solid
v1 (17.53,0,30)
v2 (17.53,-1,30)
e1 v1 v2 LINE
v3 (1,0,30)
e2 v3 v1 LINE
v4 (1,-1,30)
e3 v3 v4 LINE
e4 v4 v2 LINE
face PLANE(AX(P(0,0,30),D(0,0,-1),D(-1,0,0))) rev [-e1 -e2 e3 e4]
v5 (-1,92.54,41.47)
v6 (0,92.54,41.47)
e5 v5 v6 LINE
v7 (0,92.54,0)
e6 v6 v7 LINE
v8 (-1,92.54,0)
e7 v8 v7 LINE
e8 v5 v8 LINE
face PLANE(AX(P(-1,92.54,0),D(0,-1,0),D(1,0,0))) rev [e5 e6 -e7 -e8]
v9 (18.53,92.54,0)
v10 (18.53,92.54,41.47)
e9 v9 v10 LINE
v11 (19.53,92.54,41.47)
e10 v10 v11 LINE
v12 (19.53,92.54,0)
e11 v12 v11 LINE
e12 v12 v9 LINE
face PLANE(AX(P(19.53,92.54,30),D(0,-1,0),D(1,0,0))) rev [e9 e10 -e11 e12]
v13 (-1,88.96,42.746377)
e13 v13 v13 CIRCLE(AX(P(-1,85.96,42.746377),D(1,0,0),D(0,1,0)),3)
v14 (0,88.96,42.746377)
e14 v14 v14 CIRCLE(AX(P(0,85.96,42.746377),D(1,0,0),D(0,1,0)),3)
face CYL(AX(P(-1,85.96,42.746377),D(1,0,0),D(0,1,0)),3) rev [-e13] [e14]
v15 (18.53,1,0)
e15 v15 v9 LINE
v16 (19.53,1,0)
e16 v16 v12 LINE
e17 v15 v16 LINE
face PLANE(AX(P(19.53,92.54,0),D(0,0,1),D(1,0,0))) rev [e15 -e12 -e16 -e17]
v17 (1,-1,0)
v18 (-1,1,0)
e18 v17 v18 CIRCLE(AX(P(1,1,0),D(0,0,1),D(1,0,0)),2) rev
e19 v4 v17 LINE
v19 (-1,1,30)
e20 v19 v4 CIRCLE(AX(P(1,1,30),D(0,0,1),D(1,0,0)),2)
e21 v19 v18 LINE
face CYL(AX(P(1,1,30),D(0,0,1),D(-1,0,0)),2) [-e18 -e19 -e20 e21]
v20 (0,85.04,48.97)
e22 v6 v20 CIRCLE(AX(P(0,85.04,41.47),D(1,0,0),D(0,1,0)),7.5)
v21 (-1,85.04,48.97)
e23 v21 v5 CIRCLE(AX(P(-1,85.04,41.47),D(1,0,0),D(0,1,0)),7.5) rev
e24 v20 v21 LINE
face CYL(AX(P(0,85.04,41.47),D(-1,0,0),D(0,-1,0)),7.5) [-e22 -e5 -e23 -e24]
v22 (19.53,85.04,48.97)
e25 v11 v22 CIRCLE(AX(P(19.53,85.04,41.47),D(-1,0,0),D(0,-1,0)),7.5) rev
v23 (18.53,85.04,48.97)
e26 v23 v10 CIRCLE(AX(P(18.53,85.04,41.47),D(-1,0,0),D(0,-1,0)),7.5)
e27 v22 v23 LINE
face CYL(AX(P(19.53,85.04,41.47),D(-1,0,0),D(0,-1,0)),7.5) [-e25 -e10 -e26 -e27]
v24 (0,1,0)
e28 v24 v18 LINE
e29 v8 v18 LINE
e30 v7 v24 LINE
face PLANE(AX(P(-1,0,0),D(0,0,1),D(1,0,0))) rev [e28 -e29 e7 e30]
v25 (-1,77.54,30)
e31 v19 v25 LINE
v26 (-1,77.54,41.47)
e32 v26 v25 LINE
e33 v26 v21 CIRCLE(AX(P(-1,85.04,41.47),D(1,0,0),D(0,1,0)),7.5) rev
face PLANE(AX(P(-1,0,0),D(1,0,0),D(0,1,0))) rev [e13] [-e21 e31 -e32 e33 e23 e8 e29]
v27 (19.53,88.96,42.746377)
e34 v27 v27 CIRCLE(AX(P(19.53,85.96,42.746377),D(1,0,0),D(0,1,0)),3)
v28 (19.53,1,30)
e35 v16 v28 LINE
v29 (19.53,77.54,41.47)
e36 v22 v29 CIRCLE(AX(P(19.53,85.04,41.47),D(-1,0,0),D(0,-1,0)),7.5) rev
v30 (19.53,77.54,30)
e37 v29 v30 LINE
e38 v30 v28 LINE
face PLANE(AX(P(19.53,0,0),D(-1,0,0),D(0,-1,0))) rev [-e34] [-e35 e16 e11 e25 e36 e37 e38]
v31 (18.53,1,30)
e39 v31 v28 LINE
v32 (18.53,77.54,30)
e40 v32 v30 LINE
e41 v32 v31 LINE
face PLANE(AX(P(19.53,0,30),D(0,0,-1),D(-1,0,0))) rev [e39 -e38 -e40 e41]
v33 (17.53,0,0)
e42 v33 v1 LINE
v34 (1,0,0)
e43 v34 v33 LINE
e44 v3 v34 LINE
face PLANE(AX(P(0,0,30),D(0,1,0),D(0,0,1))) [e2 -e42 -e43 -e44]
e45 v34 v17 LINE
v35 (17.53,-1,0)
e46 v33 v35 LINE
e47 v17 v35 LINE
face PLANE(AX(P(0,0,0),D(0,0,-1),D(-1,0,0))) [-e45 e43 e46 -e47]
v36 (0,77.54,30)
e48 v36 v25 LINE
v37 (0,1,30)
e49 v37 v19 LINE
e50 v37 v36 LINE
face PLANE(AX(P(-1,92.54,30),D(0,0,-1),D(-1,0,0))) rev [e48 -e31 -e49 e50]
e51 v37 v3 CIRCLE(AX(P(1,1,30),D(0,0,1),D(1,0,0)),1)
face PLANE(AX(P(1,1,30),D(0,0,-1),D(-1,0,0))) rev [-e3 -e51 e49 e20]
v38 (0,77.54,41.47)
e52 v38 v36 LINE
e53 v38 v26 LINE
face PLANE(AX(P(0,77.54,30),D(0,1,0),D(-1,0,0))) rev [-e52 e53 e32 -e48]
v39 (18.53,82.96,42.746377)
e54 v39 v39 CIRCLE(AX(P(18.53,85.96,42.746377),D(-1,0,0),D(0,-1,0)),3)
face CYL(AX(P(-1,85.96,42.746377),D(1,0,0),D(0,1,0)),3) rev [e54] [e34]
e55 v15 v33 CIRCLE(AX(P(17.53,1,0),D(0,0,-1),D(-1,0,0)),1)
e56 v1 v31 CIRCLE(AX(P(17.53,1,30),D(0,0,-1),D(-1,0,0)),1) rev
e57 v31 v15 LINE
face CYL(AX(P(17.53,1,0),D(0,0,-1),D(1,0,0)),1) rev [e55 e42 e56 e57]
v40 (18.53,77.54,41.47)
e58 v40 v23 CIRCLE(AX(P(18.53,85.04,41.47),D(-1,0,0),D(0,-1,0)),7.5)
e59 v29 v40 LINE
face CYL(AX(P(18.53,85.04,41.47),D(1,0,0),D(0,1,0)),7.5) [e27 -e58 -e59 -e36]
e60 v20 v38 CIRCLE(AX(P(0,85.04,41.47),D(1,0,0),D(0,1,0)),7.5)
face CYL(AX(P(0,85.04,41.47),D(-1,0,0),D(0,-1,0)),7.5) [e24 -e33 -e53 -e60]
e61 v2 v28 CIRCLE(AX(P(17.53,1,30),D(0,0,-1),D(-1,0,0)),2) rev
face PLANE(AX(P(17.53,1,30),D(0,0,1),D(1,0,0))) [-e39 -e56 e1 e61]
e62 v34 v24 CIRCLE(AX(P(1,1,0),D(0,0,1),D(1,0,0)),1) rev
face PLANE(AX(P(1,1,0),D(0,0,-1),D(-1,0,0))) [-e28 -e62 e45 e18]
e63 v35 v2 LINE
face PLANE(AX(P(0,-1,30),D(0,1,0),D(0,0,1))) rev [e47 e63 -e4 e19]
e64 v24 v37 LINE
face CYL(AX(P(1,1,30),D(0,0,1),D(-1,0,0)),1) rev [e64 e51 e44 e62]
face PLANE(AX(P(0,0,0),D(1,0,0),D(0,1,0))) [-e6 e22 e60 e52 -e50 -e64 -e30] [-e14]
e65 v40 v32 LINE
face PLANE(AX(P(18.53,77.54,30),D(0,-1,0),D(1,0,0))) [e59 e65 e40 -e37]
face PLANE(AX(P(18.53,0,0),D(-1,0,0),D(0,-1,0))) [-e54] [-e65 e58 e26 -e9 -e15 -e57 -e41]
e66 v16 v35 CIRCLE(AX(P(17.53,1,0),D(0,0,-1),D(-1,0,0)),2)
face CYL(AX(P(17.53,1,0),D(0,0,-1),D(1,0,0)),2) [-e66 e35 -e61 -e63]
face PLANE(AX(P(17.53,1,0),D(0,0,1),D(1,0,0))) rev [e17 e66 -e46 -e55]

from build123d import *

# Parameters (mm, degrees)
SKETCH1_W                      = 18.53
SKETCH1_H                      = 1
BASE_FLANGE1_DEPTH             = 30
EDGE_FLANGE1_STRIP_W           = 6
EDGE_FLANGE1_STRIP_H           = 1
EDGE_FLANGE1_STRIP_CUT_DEPTH   = 30
EDGE_FLANGE1_STRIP_2_W         = 6
EDGE_FLANGE1_STRIP_2_H         = 1
EDGE_FLANGE1_STRIP_CUT_2_DEPTH = 30
EDGE_FLANGE1_DEPTH             = 30
EDGE_FLANGE1_BEND_DEPTH        = 30
SKETCH17_W                     = 18.97
SKETCH17_H                     = 15
TAB1_DEPTH                     = 1
SKETCH24_R                     = 3
CUT_EXTRUDE1_DEPTH             = 107.692049376
FILLET1_R                      = 7.5


# Sheet-metal steps are written as plain solids
with BuildPart() as part:
    # Sketch1 → Base-Flange1 (new body)
    with BuildSketch(Plane.XY):
        with Locations((9.265, -0.5)):
            Rectangle(SKETCH1_W, SKETCH1_H)
    extrude(amount=BASE_FLANGE1_DEPTH)

    # Edge-Flange1 strip (across the edge) → Edge-Flange1 strip cut (cut)
    with BuildSketch(Plane(origin=(18.53, 0, 30), x_dir=(-1, 0, 0), z_dir=(0, 0, -1))):
        with Locations((-2, -0.5)):
            Rectangle(EDGE_FLANGE1_STRIP_W, EDGE_FLANGE1_STRIP_H)
    extrude(amount=EDGE_FLANGE1_STRIP_CUT_DEPTH, mode=Mode.SUBTRACT)

    # Edge-Flange1 strip 2 (across the edge) → Edge-Flange1 strip cut 2 (cut)
    with BuildSketch(Plane.XY):
        with Locations((-2, -0.5)):
            Rectangle(EDGE_FLANGE1_STRIP_2_W, EDGE_FLANGE1_STRIP_2_H)
    extrude(amount=EDGE_FLANGE1_STRIP_CUT_2_DEPTH, mode=Mode.SUBTRACT)

    # Edge-Flange1 section (across the edge) → Edge-Flange1 (add)
    with BuildSketch(Plane(origin=(18.53, 0, 30), x_dir=(-1, 0, 0), z_dir=(0, 0, -1))):
        with BuildLine():
            Line((-1, 1), (-1, 92.54))
            Line((-1, 92.54), (0, 92.54))
            Line((0, 92.54), (0, 1))
            ThreePointArc((0, 1), (0.292893219, 0.292893219), (1, 0))
            Line((1, 0), (1, -1))
            ThreePointArc((1, -1), (-0.414213562, -0.414213562), (-1, 1))
        make_face()
    extrude(amount=EDGE_FLANGE1_DEPTH)

    # Edge-Flange1 section 2 (across the edge) → Edge-Flange1 bend (add)
    with BuildSketch(Plane.XY):
        with BuildLine():
            Line((-1, 1), (-1, 92.54))
            Line((-1, 92.54), (0, 92.54))
            Line((0, 92.54), (0, 1))
            ThreePointArc((0, 1), (0.292893219, 0.292893219), (1, 0))
            Line((1, 0), (1, -1))
            ThreePointArc((1, -1), (-0.414213562, -0.414213562), (-1, 1))
        make_face()
    extrude(amount=EDGE_FLANGE1_BEND_DEPTH)

    # Sketch17 → Tab1 (add)
    with BuildSketch(Plane(origin=(19.53, 0, 0), x_dir=(0, 0, -1), z_dir=(1, 0, 0))):
        with Locations((-39.485, 85.04)):
            Rectangle(SKETCH17_W, SKETCH17_H)
    tab1 = extrude(amount=-TAB1_DEPTH)

    # Mirror1: Tab1 across plane
    add(tab1.mirror(Plane(origin=(9.265, 0, 0), x_dir=(0, 0, 1), z_dir=(1, 0, 0))))

    # Sketch24 → Cut-Extrude1 (cut, through all)
    with BuildSketch(Plane(origin=(19.53, 0, 0), x_dir=(0, 0, -1), z_dir=(1, 0, 0))):
        with Locations(Location((-42.746376896, 85.96, 0), (0, 0, 90))):
            Circle(SKETCH24_R)
    extrude(amount=-CUT_EXTRUDE1_DEPTH, mode=Mode.SUBTRACT)

    # Fillet1
    fillet1_edges = [part.edges().sort_by_distance(p)[0] for p in [
        (19.03, 77.54, 48.97),
        (-0.5, 77.54, 48.97),
        (-0.5, 92.54, 48.97),
        (19.03, 92.54, 48.97),
    ]]
    fillet(fillet1_edges, radius=FILLET1_R - 0.0001)  # a hair under: the kernel refuses the full size


solid = part.part
